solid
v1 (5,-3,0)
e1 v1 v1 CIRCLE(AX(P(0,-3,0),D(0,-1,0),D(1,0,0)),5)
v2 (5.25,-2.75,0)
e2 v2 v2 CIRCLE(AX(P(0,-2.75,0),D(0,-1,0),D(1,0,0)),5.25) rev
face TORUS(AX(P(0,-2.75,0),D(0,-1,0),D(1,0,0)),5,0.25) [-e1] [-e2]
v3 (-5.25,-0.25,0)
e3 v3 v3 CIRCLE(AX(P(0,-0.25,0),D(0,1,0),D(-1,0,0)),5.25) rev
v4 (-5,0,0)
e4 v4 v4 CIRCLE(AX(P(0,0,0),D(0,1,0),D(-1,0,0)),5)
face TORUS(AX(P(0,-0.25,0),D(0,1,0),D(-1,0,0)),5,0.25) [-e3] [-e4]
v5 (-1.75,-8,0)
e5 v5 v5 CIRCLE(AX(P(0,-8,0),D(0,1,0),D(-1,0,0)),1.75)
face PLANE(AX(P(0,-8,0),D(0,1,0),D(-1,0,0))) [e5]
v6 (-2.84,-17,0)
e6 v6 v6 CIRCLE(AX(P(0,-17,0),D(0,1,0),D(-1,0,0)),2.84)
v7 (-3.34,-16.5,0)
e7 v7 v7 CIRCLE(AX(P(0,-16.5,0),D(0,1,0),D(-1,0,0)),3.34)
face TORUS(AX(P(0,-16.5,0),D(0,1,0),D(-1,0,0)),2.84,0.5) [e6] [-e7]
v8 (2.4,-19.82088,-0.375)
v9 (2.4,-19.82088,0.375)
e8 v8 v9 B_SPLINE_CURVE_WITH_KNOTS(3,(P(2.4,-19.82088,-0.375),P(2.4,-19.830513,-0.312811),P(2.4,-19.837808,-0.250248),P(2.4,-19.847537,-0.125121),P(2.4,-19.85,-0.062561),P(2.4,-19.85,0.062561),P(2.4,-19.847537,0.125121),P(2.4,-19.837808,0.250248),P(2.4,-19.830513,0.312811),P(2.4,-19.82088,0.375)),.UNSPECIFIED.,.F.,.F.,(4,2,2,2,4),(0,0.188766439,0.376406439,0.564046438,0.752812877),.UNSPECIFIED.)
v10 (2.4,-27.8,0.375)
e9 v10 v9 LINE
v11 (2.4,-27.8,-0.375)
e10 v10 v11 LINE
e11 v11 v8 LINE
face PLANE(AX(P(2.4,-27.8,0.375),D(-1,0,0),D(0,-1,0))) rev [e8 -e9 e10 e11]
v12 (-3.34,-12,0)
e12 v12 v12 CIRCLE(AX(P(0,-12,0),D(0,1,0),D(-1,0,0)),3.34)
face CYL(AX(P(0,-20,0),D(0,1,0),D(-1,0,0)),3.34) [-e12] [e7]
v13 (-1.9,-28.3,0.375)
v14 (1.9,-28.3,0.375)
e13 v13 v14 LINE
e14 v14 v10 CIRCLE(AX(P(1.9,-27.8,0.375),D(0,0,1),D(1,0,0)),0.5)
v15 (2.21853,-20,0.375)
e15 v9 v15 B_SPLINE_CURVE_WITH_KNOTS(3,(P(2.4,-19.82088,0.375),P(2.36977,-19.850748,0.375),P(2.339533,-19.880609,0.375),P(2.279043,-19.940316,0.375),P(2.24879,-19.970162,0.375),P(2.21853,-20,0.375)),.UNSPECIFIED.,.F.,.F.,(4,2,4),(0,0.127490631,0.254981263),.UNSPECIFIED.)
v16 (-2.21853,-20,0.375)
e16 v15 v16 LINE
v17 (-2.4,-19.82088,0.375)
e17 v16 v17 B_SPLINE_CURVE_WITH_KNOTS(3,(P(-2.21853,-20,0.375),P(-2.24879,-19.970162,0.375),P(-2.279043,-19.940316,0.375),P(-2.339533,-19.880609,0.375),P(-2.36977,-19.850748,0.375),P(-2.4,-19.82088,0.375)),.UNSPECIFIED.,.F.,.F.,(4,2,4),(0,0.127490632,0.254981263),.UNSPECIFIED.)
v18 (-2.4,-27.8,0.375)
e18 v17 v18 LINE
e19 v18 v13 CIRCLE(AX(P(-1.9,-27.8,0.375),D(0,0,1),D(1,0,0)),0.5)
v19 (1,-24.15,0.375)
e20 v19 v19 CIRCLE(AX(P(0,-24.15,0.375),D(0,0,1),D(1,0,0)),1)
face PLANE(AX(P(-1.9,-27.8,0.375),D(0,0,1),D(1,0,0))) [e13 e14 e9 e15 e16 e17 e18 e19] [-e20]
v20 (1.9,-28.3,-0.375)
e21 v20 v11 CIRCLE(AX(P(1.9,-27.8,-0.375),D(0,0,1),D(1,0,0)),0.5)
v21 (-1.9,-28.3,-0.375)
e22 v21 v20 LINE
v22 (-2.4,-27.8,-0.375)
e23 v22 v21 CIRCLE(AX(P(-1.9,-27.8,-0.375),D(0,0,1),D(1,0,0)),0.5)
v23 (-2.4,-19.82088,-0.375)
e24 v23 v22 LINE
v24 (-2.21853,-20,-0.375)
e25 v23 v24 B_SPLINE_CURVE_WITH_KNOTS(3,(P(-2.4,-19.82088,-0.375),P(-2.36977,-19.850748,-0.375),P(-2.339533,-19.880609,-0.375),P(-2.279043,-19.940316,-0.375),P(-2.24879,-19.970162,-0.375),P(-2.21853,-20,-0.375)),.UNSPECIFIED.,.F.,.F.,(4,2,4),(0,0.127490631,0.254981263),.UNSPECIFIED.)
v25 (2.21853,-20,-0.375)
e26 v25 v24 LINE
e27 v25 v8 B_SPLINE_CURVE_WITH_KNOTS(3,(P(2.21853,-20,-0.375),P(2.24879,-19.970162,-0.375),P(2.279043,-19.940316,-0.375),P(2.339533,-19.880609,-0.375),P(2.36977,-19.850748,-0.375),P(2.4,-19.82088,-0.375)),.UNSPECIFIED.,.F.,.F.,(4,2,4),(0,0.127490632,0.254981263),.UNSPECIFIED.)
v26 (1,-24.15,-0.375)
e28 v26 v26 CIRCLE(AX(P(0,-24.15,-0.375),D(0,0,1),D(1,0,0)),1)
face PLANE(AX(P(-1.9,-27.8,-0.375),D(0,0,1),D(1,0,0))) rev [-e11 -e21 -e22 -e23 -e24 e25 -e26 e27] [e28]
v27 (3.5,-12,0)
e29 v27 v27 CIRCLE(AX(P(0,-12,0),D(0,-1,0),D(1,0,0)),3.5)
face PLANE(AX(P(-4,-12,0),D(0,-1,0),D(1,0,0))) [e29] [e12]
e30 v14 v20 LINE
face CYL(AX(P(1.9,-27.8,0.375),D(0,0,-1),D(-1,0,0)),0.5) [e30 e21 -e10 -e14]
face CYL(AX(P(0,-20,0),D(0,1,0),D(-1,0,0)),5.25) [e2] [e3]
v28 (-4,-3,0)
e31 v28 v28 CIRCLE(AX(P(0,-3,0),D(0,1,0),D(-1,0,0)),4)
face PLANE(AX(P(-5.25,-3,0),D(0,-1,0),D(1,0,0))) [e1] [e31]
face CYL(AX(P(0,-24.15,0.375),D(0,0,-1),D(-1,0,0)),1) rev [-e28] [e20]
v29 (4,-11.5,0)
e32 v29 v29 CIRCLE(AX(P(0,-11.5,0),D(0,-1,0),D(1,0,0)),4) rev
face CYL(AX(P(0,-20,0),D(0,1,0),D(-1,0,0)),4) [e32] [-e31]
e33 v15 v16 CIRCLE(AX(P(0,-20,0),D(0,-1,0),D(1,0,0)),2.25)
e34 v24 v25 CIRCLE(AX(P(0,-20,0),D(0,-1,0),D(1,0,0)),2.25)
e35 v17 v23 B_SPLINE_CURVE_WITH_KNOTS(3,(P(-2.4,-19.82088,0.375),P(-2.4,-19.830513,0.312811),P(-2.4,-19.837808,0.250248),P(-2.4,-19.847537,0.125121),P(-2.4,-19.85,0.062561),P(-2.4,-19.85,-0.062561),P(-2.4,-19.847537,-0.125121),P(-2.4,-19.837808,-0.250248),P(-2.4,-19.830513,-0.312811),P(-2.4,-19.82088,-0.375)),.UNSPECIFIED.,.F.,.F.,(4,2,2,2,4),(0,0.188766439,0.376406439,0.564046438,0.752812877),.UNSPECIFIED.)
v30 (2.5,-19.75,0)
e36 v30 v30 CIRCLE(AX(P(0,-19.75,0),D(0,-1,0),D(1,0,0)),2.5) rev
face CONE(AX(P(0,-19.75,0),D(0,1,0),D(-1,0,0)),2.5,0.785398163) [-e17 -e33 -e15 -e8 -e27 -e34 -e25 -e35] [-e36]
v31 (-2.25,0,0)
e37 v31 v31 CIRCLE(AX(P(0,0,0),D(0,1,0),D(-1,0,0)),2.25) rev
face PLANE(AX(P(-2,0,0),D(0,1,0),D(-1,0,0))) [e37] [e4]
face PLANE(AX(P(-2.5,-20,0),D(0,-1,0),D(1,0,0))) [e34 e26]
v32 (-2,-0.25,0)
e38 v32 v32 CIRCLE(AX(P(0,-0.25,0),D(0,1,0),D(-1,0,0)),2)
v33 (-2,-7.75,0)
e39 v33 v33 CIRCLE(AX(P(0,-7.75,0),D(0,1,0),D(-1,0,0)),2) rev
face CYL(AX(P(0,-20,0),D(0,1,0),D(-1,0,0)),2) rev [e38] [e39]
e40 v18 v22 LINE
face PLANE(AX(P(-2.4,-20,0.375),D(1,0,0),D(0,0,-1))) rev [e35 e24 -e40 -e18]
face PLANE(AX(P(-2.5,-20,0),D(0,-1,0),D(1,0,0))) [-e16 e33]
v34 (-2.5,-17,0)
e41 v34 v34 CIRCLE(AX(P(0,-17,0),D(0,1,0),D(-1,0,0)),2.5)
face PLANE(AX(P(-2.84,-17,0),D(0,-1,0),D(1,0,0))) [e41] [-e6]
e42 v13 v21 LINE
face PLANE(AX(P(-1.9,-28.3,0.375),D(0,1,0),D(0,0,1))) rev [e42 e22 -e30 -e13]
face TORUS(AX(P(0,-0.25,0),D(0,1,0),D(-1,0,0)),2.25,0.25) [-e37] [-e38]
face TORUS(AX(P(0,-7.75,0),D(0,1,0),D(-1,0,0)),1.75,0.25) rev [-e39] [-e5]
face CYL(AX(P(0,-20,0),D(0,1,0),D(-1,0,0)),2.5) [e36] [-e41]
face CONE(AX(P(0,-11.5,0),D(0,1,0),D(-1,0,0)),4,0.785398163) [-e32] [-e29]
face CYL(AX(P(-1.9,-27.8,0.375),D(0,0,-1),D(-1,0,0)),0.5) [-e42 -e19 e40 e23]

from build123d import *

# Parameters (mm, degrees)
SKETCH2_R           = 1
BOSS_EXTRUDE1_DEPTH = 0.375
CHAMFER1_SIZE       = 0.25
CHAMFER2_SIZE       = 0.5
FILLET1_R           = 0.25


with BuildPart() as part:
    # Sketch1 → Revolve1 (revolve)
    with BuildSketch(Plane.XY):
        with BuildLine():
            Line((-2, 0), (-5.25, 0))
            Line((-5.25, 0), (-5.25, -3))
            Line((-5.25, -3), (-4, -3))
            Line((-4, -3), (-4, -12))
            Line((-4, -12), (-3.34, -12))
            Line((-3.34, -12), (-3.34, -16.5))
            ThreePointArc((-3.34, -16.5), (-3.193553391, -16.853553391), (-2.84, -17))
            Line((-2.84, -17), (-2.5, -17))
            Line((-2.5, -17), (-2.5, -20))
            Line((-2.5, -20), (0, -20))
            Line((0, -20), (0, -8))
            Line((0, -8), (-2, -8))
            Line((-2, -8), (-2, 0))
        make_face()
    revolve(axis=Axis((0, -20, 0), (0, -1, 0)))

    # Sketch2 → Boss-Extrude1 (add, symmetric)
    with BuildSketch(Plane.XY):
        with BuildLine():
            Line((-2.4, -20), (-2.4, -27.8))
            ThreePointArc((-2.4, -27.8), (-2.253553391, -28.153553391), (-1.9, -28.3))
            Line((-1.9, -28.3), (1.9, -28.3))
            ThreePointArc((1.9, -28.3), (2.253553391, -28.153553391), (2.4, -27.8))
            Line((2.4, -27.8), (2.4, -20))
            Line((2.4, -20), (-2.4, -20))
        make_face()
        with Locations((0, -24.15)):
            Circle(SKETCH2_R, mode=Mode.SUBTRACT)
    extrude(amount=BOSS_EXTRUDE1_DEPTH, both=True)

    # Chamfer1
    # the kernel refuses this chamfer: 0.25 mm, written as the material it takes off along each edge
    with BuildSketch(Plane(origin=(0, -20, 0), x_dir=(-1, 0, 0), z_dir=(0, 0, 1))) as chamfer1_piece_1_section:
        Polygon((2.5 - CHAMFER1_SIZE, 0), (2.5, -CHAMFER1_SIZE), (2.5, 0), align=None)
    chamfer1_piece_1 = revolve(axis=Axis((0, -20, 0), (0, -1, 0)), mode=Mode.PRIVATE)
    chamfer1_piece_1 = split(chamfer1_piece_1, bisect_by=Plane(origin=(-2.4, -19.896022541, 0), z_dir=(-1, 0, 0)), keep=Keep.TOP, mode=Mode.PRIVATE)
    add(chamfer1_piece_1, mode=Mode.SUBTRACT)
    with BuildSketch(Plane(origin=(0, -20, 0), x_dir=(-1, 0, 0), z_dir=(0, 0, 1))) as chamfer1_piece_2_section:
        Polygon((2.5 - CHAMFER1_SIZE, 0), (2.5, -CHAMFER1_SIZE), (2.5, 0), align=None)
    chamfer1_piece_2 = revolve(axis=Axis((0, -20, 0), (0, -1, 0)), mode=Mode.PRIVATE)
    chamfer1_piece_2 = split(chamfer1_piece_2, bisect_by=Plane(origin=(-7e-09, -19.879189064, -0.375), z_dir=(0, 0, -1)), keep=Keep.TOP, mode=Mode.PRIVATE)
    add(chamfer1_piece_2, mode=Mode.SUBTRACT)
    with BuildSketch(Plane(origin=(0, -20, 0), x_dir=(-1, 0, 0), z_dir=(0, 0, 1))) as chamfer1_piece_3_section:
        Polygon((2.5 - CHAMFER1_SIZE, 0), (2.5, -CHAMFER1_SIZE), (2.5, 0), align=None)
    chamfer1_piece_3 = revolve(axis=Axis((0, -20, 0), (0, -1, 0)), mode=Mode.PRIVATE)
    chamfer1_piece_3 = split(chamfer1_piece_3, bisect_by=Plane(origin=(-7e-09, -19.879189064, 0.375), z_dir=(0, 0, 1)), keep=Keep.TOP, mode=Mode.PRIVATE)
    add(chamfer1_piece_3, mode=Mode.SUBTRACT)
    with BuildSketch(Plane(origin=(0, -20, 0), x_dir=(-1, 0, 0), z_dir=(0, 0, 1))) as chamfer1_piece_4_section:
        Polygon((2.5 - CHAMFER1_SIZE, 0), (2.5, -CHAMFER1_SIZE), (2.5, 0), align=None)
    chamfer1_piece_4 = revolve(axis=Axis((0, -20, 0), (0, -1, 0)), mode=Mode.PRIVATE)
    chamfer1_piece_4 = split(chamfer1_piece_4, bisect_by=Plane(origin=(2.4, -19.896022542, 0), z_dir=(1, 0, 0)), keep=Keep.TOP, mode=Mode.PRIVATE)
    add(chamfer1_piece_4, mode=Mode.SUBTRACT)

    # Chamfer2
    chamfer2_edges = [part.edges().sort_by_distance(p)[0] for p in [
        (4, -12, 0),
    ]]
    chamfer(chamfer2_edges, length=CHAMFER2_SIZE)

    # Fillet1
    fillet1_edges = [part.edges().sort_by_distance(p)[0] for p in [
        (2, -8, 0),
        (5.25, -3, 0),
        (5.25, 0, 0),
        (2, 0, 0),
    ]]
    fillet(fillet1_edges, radius=FILLET1_R)


solid = part.part
